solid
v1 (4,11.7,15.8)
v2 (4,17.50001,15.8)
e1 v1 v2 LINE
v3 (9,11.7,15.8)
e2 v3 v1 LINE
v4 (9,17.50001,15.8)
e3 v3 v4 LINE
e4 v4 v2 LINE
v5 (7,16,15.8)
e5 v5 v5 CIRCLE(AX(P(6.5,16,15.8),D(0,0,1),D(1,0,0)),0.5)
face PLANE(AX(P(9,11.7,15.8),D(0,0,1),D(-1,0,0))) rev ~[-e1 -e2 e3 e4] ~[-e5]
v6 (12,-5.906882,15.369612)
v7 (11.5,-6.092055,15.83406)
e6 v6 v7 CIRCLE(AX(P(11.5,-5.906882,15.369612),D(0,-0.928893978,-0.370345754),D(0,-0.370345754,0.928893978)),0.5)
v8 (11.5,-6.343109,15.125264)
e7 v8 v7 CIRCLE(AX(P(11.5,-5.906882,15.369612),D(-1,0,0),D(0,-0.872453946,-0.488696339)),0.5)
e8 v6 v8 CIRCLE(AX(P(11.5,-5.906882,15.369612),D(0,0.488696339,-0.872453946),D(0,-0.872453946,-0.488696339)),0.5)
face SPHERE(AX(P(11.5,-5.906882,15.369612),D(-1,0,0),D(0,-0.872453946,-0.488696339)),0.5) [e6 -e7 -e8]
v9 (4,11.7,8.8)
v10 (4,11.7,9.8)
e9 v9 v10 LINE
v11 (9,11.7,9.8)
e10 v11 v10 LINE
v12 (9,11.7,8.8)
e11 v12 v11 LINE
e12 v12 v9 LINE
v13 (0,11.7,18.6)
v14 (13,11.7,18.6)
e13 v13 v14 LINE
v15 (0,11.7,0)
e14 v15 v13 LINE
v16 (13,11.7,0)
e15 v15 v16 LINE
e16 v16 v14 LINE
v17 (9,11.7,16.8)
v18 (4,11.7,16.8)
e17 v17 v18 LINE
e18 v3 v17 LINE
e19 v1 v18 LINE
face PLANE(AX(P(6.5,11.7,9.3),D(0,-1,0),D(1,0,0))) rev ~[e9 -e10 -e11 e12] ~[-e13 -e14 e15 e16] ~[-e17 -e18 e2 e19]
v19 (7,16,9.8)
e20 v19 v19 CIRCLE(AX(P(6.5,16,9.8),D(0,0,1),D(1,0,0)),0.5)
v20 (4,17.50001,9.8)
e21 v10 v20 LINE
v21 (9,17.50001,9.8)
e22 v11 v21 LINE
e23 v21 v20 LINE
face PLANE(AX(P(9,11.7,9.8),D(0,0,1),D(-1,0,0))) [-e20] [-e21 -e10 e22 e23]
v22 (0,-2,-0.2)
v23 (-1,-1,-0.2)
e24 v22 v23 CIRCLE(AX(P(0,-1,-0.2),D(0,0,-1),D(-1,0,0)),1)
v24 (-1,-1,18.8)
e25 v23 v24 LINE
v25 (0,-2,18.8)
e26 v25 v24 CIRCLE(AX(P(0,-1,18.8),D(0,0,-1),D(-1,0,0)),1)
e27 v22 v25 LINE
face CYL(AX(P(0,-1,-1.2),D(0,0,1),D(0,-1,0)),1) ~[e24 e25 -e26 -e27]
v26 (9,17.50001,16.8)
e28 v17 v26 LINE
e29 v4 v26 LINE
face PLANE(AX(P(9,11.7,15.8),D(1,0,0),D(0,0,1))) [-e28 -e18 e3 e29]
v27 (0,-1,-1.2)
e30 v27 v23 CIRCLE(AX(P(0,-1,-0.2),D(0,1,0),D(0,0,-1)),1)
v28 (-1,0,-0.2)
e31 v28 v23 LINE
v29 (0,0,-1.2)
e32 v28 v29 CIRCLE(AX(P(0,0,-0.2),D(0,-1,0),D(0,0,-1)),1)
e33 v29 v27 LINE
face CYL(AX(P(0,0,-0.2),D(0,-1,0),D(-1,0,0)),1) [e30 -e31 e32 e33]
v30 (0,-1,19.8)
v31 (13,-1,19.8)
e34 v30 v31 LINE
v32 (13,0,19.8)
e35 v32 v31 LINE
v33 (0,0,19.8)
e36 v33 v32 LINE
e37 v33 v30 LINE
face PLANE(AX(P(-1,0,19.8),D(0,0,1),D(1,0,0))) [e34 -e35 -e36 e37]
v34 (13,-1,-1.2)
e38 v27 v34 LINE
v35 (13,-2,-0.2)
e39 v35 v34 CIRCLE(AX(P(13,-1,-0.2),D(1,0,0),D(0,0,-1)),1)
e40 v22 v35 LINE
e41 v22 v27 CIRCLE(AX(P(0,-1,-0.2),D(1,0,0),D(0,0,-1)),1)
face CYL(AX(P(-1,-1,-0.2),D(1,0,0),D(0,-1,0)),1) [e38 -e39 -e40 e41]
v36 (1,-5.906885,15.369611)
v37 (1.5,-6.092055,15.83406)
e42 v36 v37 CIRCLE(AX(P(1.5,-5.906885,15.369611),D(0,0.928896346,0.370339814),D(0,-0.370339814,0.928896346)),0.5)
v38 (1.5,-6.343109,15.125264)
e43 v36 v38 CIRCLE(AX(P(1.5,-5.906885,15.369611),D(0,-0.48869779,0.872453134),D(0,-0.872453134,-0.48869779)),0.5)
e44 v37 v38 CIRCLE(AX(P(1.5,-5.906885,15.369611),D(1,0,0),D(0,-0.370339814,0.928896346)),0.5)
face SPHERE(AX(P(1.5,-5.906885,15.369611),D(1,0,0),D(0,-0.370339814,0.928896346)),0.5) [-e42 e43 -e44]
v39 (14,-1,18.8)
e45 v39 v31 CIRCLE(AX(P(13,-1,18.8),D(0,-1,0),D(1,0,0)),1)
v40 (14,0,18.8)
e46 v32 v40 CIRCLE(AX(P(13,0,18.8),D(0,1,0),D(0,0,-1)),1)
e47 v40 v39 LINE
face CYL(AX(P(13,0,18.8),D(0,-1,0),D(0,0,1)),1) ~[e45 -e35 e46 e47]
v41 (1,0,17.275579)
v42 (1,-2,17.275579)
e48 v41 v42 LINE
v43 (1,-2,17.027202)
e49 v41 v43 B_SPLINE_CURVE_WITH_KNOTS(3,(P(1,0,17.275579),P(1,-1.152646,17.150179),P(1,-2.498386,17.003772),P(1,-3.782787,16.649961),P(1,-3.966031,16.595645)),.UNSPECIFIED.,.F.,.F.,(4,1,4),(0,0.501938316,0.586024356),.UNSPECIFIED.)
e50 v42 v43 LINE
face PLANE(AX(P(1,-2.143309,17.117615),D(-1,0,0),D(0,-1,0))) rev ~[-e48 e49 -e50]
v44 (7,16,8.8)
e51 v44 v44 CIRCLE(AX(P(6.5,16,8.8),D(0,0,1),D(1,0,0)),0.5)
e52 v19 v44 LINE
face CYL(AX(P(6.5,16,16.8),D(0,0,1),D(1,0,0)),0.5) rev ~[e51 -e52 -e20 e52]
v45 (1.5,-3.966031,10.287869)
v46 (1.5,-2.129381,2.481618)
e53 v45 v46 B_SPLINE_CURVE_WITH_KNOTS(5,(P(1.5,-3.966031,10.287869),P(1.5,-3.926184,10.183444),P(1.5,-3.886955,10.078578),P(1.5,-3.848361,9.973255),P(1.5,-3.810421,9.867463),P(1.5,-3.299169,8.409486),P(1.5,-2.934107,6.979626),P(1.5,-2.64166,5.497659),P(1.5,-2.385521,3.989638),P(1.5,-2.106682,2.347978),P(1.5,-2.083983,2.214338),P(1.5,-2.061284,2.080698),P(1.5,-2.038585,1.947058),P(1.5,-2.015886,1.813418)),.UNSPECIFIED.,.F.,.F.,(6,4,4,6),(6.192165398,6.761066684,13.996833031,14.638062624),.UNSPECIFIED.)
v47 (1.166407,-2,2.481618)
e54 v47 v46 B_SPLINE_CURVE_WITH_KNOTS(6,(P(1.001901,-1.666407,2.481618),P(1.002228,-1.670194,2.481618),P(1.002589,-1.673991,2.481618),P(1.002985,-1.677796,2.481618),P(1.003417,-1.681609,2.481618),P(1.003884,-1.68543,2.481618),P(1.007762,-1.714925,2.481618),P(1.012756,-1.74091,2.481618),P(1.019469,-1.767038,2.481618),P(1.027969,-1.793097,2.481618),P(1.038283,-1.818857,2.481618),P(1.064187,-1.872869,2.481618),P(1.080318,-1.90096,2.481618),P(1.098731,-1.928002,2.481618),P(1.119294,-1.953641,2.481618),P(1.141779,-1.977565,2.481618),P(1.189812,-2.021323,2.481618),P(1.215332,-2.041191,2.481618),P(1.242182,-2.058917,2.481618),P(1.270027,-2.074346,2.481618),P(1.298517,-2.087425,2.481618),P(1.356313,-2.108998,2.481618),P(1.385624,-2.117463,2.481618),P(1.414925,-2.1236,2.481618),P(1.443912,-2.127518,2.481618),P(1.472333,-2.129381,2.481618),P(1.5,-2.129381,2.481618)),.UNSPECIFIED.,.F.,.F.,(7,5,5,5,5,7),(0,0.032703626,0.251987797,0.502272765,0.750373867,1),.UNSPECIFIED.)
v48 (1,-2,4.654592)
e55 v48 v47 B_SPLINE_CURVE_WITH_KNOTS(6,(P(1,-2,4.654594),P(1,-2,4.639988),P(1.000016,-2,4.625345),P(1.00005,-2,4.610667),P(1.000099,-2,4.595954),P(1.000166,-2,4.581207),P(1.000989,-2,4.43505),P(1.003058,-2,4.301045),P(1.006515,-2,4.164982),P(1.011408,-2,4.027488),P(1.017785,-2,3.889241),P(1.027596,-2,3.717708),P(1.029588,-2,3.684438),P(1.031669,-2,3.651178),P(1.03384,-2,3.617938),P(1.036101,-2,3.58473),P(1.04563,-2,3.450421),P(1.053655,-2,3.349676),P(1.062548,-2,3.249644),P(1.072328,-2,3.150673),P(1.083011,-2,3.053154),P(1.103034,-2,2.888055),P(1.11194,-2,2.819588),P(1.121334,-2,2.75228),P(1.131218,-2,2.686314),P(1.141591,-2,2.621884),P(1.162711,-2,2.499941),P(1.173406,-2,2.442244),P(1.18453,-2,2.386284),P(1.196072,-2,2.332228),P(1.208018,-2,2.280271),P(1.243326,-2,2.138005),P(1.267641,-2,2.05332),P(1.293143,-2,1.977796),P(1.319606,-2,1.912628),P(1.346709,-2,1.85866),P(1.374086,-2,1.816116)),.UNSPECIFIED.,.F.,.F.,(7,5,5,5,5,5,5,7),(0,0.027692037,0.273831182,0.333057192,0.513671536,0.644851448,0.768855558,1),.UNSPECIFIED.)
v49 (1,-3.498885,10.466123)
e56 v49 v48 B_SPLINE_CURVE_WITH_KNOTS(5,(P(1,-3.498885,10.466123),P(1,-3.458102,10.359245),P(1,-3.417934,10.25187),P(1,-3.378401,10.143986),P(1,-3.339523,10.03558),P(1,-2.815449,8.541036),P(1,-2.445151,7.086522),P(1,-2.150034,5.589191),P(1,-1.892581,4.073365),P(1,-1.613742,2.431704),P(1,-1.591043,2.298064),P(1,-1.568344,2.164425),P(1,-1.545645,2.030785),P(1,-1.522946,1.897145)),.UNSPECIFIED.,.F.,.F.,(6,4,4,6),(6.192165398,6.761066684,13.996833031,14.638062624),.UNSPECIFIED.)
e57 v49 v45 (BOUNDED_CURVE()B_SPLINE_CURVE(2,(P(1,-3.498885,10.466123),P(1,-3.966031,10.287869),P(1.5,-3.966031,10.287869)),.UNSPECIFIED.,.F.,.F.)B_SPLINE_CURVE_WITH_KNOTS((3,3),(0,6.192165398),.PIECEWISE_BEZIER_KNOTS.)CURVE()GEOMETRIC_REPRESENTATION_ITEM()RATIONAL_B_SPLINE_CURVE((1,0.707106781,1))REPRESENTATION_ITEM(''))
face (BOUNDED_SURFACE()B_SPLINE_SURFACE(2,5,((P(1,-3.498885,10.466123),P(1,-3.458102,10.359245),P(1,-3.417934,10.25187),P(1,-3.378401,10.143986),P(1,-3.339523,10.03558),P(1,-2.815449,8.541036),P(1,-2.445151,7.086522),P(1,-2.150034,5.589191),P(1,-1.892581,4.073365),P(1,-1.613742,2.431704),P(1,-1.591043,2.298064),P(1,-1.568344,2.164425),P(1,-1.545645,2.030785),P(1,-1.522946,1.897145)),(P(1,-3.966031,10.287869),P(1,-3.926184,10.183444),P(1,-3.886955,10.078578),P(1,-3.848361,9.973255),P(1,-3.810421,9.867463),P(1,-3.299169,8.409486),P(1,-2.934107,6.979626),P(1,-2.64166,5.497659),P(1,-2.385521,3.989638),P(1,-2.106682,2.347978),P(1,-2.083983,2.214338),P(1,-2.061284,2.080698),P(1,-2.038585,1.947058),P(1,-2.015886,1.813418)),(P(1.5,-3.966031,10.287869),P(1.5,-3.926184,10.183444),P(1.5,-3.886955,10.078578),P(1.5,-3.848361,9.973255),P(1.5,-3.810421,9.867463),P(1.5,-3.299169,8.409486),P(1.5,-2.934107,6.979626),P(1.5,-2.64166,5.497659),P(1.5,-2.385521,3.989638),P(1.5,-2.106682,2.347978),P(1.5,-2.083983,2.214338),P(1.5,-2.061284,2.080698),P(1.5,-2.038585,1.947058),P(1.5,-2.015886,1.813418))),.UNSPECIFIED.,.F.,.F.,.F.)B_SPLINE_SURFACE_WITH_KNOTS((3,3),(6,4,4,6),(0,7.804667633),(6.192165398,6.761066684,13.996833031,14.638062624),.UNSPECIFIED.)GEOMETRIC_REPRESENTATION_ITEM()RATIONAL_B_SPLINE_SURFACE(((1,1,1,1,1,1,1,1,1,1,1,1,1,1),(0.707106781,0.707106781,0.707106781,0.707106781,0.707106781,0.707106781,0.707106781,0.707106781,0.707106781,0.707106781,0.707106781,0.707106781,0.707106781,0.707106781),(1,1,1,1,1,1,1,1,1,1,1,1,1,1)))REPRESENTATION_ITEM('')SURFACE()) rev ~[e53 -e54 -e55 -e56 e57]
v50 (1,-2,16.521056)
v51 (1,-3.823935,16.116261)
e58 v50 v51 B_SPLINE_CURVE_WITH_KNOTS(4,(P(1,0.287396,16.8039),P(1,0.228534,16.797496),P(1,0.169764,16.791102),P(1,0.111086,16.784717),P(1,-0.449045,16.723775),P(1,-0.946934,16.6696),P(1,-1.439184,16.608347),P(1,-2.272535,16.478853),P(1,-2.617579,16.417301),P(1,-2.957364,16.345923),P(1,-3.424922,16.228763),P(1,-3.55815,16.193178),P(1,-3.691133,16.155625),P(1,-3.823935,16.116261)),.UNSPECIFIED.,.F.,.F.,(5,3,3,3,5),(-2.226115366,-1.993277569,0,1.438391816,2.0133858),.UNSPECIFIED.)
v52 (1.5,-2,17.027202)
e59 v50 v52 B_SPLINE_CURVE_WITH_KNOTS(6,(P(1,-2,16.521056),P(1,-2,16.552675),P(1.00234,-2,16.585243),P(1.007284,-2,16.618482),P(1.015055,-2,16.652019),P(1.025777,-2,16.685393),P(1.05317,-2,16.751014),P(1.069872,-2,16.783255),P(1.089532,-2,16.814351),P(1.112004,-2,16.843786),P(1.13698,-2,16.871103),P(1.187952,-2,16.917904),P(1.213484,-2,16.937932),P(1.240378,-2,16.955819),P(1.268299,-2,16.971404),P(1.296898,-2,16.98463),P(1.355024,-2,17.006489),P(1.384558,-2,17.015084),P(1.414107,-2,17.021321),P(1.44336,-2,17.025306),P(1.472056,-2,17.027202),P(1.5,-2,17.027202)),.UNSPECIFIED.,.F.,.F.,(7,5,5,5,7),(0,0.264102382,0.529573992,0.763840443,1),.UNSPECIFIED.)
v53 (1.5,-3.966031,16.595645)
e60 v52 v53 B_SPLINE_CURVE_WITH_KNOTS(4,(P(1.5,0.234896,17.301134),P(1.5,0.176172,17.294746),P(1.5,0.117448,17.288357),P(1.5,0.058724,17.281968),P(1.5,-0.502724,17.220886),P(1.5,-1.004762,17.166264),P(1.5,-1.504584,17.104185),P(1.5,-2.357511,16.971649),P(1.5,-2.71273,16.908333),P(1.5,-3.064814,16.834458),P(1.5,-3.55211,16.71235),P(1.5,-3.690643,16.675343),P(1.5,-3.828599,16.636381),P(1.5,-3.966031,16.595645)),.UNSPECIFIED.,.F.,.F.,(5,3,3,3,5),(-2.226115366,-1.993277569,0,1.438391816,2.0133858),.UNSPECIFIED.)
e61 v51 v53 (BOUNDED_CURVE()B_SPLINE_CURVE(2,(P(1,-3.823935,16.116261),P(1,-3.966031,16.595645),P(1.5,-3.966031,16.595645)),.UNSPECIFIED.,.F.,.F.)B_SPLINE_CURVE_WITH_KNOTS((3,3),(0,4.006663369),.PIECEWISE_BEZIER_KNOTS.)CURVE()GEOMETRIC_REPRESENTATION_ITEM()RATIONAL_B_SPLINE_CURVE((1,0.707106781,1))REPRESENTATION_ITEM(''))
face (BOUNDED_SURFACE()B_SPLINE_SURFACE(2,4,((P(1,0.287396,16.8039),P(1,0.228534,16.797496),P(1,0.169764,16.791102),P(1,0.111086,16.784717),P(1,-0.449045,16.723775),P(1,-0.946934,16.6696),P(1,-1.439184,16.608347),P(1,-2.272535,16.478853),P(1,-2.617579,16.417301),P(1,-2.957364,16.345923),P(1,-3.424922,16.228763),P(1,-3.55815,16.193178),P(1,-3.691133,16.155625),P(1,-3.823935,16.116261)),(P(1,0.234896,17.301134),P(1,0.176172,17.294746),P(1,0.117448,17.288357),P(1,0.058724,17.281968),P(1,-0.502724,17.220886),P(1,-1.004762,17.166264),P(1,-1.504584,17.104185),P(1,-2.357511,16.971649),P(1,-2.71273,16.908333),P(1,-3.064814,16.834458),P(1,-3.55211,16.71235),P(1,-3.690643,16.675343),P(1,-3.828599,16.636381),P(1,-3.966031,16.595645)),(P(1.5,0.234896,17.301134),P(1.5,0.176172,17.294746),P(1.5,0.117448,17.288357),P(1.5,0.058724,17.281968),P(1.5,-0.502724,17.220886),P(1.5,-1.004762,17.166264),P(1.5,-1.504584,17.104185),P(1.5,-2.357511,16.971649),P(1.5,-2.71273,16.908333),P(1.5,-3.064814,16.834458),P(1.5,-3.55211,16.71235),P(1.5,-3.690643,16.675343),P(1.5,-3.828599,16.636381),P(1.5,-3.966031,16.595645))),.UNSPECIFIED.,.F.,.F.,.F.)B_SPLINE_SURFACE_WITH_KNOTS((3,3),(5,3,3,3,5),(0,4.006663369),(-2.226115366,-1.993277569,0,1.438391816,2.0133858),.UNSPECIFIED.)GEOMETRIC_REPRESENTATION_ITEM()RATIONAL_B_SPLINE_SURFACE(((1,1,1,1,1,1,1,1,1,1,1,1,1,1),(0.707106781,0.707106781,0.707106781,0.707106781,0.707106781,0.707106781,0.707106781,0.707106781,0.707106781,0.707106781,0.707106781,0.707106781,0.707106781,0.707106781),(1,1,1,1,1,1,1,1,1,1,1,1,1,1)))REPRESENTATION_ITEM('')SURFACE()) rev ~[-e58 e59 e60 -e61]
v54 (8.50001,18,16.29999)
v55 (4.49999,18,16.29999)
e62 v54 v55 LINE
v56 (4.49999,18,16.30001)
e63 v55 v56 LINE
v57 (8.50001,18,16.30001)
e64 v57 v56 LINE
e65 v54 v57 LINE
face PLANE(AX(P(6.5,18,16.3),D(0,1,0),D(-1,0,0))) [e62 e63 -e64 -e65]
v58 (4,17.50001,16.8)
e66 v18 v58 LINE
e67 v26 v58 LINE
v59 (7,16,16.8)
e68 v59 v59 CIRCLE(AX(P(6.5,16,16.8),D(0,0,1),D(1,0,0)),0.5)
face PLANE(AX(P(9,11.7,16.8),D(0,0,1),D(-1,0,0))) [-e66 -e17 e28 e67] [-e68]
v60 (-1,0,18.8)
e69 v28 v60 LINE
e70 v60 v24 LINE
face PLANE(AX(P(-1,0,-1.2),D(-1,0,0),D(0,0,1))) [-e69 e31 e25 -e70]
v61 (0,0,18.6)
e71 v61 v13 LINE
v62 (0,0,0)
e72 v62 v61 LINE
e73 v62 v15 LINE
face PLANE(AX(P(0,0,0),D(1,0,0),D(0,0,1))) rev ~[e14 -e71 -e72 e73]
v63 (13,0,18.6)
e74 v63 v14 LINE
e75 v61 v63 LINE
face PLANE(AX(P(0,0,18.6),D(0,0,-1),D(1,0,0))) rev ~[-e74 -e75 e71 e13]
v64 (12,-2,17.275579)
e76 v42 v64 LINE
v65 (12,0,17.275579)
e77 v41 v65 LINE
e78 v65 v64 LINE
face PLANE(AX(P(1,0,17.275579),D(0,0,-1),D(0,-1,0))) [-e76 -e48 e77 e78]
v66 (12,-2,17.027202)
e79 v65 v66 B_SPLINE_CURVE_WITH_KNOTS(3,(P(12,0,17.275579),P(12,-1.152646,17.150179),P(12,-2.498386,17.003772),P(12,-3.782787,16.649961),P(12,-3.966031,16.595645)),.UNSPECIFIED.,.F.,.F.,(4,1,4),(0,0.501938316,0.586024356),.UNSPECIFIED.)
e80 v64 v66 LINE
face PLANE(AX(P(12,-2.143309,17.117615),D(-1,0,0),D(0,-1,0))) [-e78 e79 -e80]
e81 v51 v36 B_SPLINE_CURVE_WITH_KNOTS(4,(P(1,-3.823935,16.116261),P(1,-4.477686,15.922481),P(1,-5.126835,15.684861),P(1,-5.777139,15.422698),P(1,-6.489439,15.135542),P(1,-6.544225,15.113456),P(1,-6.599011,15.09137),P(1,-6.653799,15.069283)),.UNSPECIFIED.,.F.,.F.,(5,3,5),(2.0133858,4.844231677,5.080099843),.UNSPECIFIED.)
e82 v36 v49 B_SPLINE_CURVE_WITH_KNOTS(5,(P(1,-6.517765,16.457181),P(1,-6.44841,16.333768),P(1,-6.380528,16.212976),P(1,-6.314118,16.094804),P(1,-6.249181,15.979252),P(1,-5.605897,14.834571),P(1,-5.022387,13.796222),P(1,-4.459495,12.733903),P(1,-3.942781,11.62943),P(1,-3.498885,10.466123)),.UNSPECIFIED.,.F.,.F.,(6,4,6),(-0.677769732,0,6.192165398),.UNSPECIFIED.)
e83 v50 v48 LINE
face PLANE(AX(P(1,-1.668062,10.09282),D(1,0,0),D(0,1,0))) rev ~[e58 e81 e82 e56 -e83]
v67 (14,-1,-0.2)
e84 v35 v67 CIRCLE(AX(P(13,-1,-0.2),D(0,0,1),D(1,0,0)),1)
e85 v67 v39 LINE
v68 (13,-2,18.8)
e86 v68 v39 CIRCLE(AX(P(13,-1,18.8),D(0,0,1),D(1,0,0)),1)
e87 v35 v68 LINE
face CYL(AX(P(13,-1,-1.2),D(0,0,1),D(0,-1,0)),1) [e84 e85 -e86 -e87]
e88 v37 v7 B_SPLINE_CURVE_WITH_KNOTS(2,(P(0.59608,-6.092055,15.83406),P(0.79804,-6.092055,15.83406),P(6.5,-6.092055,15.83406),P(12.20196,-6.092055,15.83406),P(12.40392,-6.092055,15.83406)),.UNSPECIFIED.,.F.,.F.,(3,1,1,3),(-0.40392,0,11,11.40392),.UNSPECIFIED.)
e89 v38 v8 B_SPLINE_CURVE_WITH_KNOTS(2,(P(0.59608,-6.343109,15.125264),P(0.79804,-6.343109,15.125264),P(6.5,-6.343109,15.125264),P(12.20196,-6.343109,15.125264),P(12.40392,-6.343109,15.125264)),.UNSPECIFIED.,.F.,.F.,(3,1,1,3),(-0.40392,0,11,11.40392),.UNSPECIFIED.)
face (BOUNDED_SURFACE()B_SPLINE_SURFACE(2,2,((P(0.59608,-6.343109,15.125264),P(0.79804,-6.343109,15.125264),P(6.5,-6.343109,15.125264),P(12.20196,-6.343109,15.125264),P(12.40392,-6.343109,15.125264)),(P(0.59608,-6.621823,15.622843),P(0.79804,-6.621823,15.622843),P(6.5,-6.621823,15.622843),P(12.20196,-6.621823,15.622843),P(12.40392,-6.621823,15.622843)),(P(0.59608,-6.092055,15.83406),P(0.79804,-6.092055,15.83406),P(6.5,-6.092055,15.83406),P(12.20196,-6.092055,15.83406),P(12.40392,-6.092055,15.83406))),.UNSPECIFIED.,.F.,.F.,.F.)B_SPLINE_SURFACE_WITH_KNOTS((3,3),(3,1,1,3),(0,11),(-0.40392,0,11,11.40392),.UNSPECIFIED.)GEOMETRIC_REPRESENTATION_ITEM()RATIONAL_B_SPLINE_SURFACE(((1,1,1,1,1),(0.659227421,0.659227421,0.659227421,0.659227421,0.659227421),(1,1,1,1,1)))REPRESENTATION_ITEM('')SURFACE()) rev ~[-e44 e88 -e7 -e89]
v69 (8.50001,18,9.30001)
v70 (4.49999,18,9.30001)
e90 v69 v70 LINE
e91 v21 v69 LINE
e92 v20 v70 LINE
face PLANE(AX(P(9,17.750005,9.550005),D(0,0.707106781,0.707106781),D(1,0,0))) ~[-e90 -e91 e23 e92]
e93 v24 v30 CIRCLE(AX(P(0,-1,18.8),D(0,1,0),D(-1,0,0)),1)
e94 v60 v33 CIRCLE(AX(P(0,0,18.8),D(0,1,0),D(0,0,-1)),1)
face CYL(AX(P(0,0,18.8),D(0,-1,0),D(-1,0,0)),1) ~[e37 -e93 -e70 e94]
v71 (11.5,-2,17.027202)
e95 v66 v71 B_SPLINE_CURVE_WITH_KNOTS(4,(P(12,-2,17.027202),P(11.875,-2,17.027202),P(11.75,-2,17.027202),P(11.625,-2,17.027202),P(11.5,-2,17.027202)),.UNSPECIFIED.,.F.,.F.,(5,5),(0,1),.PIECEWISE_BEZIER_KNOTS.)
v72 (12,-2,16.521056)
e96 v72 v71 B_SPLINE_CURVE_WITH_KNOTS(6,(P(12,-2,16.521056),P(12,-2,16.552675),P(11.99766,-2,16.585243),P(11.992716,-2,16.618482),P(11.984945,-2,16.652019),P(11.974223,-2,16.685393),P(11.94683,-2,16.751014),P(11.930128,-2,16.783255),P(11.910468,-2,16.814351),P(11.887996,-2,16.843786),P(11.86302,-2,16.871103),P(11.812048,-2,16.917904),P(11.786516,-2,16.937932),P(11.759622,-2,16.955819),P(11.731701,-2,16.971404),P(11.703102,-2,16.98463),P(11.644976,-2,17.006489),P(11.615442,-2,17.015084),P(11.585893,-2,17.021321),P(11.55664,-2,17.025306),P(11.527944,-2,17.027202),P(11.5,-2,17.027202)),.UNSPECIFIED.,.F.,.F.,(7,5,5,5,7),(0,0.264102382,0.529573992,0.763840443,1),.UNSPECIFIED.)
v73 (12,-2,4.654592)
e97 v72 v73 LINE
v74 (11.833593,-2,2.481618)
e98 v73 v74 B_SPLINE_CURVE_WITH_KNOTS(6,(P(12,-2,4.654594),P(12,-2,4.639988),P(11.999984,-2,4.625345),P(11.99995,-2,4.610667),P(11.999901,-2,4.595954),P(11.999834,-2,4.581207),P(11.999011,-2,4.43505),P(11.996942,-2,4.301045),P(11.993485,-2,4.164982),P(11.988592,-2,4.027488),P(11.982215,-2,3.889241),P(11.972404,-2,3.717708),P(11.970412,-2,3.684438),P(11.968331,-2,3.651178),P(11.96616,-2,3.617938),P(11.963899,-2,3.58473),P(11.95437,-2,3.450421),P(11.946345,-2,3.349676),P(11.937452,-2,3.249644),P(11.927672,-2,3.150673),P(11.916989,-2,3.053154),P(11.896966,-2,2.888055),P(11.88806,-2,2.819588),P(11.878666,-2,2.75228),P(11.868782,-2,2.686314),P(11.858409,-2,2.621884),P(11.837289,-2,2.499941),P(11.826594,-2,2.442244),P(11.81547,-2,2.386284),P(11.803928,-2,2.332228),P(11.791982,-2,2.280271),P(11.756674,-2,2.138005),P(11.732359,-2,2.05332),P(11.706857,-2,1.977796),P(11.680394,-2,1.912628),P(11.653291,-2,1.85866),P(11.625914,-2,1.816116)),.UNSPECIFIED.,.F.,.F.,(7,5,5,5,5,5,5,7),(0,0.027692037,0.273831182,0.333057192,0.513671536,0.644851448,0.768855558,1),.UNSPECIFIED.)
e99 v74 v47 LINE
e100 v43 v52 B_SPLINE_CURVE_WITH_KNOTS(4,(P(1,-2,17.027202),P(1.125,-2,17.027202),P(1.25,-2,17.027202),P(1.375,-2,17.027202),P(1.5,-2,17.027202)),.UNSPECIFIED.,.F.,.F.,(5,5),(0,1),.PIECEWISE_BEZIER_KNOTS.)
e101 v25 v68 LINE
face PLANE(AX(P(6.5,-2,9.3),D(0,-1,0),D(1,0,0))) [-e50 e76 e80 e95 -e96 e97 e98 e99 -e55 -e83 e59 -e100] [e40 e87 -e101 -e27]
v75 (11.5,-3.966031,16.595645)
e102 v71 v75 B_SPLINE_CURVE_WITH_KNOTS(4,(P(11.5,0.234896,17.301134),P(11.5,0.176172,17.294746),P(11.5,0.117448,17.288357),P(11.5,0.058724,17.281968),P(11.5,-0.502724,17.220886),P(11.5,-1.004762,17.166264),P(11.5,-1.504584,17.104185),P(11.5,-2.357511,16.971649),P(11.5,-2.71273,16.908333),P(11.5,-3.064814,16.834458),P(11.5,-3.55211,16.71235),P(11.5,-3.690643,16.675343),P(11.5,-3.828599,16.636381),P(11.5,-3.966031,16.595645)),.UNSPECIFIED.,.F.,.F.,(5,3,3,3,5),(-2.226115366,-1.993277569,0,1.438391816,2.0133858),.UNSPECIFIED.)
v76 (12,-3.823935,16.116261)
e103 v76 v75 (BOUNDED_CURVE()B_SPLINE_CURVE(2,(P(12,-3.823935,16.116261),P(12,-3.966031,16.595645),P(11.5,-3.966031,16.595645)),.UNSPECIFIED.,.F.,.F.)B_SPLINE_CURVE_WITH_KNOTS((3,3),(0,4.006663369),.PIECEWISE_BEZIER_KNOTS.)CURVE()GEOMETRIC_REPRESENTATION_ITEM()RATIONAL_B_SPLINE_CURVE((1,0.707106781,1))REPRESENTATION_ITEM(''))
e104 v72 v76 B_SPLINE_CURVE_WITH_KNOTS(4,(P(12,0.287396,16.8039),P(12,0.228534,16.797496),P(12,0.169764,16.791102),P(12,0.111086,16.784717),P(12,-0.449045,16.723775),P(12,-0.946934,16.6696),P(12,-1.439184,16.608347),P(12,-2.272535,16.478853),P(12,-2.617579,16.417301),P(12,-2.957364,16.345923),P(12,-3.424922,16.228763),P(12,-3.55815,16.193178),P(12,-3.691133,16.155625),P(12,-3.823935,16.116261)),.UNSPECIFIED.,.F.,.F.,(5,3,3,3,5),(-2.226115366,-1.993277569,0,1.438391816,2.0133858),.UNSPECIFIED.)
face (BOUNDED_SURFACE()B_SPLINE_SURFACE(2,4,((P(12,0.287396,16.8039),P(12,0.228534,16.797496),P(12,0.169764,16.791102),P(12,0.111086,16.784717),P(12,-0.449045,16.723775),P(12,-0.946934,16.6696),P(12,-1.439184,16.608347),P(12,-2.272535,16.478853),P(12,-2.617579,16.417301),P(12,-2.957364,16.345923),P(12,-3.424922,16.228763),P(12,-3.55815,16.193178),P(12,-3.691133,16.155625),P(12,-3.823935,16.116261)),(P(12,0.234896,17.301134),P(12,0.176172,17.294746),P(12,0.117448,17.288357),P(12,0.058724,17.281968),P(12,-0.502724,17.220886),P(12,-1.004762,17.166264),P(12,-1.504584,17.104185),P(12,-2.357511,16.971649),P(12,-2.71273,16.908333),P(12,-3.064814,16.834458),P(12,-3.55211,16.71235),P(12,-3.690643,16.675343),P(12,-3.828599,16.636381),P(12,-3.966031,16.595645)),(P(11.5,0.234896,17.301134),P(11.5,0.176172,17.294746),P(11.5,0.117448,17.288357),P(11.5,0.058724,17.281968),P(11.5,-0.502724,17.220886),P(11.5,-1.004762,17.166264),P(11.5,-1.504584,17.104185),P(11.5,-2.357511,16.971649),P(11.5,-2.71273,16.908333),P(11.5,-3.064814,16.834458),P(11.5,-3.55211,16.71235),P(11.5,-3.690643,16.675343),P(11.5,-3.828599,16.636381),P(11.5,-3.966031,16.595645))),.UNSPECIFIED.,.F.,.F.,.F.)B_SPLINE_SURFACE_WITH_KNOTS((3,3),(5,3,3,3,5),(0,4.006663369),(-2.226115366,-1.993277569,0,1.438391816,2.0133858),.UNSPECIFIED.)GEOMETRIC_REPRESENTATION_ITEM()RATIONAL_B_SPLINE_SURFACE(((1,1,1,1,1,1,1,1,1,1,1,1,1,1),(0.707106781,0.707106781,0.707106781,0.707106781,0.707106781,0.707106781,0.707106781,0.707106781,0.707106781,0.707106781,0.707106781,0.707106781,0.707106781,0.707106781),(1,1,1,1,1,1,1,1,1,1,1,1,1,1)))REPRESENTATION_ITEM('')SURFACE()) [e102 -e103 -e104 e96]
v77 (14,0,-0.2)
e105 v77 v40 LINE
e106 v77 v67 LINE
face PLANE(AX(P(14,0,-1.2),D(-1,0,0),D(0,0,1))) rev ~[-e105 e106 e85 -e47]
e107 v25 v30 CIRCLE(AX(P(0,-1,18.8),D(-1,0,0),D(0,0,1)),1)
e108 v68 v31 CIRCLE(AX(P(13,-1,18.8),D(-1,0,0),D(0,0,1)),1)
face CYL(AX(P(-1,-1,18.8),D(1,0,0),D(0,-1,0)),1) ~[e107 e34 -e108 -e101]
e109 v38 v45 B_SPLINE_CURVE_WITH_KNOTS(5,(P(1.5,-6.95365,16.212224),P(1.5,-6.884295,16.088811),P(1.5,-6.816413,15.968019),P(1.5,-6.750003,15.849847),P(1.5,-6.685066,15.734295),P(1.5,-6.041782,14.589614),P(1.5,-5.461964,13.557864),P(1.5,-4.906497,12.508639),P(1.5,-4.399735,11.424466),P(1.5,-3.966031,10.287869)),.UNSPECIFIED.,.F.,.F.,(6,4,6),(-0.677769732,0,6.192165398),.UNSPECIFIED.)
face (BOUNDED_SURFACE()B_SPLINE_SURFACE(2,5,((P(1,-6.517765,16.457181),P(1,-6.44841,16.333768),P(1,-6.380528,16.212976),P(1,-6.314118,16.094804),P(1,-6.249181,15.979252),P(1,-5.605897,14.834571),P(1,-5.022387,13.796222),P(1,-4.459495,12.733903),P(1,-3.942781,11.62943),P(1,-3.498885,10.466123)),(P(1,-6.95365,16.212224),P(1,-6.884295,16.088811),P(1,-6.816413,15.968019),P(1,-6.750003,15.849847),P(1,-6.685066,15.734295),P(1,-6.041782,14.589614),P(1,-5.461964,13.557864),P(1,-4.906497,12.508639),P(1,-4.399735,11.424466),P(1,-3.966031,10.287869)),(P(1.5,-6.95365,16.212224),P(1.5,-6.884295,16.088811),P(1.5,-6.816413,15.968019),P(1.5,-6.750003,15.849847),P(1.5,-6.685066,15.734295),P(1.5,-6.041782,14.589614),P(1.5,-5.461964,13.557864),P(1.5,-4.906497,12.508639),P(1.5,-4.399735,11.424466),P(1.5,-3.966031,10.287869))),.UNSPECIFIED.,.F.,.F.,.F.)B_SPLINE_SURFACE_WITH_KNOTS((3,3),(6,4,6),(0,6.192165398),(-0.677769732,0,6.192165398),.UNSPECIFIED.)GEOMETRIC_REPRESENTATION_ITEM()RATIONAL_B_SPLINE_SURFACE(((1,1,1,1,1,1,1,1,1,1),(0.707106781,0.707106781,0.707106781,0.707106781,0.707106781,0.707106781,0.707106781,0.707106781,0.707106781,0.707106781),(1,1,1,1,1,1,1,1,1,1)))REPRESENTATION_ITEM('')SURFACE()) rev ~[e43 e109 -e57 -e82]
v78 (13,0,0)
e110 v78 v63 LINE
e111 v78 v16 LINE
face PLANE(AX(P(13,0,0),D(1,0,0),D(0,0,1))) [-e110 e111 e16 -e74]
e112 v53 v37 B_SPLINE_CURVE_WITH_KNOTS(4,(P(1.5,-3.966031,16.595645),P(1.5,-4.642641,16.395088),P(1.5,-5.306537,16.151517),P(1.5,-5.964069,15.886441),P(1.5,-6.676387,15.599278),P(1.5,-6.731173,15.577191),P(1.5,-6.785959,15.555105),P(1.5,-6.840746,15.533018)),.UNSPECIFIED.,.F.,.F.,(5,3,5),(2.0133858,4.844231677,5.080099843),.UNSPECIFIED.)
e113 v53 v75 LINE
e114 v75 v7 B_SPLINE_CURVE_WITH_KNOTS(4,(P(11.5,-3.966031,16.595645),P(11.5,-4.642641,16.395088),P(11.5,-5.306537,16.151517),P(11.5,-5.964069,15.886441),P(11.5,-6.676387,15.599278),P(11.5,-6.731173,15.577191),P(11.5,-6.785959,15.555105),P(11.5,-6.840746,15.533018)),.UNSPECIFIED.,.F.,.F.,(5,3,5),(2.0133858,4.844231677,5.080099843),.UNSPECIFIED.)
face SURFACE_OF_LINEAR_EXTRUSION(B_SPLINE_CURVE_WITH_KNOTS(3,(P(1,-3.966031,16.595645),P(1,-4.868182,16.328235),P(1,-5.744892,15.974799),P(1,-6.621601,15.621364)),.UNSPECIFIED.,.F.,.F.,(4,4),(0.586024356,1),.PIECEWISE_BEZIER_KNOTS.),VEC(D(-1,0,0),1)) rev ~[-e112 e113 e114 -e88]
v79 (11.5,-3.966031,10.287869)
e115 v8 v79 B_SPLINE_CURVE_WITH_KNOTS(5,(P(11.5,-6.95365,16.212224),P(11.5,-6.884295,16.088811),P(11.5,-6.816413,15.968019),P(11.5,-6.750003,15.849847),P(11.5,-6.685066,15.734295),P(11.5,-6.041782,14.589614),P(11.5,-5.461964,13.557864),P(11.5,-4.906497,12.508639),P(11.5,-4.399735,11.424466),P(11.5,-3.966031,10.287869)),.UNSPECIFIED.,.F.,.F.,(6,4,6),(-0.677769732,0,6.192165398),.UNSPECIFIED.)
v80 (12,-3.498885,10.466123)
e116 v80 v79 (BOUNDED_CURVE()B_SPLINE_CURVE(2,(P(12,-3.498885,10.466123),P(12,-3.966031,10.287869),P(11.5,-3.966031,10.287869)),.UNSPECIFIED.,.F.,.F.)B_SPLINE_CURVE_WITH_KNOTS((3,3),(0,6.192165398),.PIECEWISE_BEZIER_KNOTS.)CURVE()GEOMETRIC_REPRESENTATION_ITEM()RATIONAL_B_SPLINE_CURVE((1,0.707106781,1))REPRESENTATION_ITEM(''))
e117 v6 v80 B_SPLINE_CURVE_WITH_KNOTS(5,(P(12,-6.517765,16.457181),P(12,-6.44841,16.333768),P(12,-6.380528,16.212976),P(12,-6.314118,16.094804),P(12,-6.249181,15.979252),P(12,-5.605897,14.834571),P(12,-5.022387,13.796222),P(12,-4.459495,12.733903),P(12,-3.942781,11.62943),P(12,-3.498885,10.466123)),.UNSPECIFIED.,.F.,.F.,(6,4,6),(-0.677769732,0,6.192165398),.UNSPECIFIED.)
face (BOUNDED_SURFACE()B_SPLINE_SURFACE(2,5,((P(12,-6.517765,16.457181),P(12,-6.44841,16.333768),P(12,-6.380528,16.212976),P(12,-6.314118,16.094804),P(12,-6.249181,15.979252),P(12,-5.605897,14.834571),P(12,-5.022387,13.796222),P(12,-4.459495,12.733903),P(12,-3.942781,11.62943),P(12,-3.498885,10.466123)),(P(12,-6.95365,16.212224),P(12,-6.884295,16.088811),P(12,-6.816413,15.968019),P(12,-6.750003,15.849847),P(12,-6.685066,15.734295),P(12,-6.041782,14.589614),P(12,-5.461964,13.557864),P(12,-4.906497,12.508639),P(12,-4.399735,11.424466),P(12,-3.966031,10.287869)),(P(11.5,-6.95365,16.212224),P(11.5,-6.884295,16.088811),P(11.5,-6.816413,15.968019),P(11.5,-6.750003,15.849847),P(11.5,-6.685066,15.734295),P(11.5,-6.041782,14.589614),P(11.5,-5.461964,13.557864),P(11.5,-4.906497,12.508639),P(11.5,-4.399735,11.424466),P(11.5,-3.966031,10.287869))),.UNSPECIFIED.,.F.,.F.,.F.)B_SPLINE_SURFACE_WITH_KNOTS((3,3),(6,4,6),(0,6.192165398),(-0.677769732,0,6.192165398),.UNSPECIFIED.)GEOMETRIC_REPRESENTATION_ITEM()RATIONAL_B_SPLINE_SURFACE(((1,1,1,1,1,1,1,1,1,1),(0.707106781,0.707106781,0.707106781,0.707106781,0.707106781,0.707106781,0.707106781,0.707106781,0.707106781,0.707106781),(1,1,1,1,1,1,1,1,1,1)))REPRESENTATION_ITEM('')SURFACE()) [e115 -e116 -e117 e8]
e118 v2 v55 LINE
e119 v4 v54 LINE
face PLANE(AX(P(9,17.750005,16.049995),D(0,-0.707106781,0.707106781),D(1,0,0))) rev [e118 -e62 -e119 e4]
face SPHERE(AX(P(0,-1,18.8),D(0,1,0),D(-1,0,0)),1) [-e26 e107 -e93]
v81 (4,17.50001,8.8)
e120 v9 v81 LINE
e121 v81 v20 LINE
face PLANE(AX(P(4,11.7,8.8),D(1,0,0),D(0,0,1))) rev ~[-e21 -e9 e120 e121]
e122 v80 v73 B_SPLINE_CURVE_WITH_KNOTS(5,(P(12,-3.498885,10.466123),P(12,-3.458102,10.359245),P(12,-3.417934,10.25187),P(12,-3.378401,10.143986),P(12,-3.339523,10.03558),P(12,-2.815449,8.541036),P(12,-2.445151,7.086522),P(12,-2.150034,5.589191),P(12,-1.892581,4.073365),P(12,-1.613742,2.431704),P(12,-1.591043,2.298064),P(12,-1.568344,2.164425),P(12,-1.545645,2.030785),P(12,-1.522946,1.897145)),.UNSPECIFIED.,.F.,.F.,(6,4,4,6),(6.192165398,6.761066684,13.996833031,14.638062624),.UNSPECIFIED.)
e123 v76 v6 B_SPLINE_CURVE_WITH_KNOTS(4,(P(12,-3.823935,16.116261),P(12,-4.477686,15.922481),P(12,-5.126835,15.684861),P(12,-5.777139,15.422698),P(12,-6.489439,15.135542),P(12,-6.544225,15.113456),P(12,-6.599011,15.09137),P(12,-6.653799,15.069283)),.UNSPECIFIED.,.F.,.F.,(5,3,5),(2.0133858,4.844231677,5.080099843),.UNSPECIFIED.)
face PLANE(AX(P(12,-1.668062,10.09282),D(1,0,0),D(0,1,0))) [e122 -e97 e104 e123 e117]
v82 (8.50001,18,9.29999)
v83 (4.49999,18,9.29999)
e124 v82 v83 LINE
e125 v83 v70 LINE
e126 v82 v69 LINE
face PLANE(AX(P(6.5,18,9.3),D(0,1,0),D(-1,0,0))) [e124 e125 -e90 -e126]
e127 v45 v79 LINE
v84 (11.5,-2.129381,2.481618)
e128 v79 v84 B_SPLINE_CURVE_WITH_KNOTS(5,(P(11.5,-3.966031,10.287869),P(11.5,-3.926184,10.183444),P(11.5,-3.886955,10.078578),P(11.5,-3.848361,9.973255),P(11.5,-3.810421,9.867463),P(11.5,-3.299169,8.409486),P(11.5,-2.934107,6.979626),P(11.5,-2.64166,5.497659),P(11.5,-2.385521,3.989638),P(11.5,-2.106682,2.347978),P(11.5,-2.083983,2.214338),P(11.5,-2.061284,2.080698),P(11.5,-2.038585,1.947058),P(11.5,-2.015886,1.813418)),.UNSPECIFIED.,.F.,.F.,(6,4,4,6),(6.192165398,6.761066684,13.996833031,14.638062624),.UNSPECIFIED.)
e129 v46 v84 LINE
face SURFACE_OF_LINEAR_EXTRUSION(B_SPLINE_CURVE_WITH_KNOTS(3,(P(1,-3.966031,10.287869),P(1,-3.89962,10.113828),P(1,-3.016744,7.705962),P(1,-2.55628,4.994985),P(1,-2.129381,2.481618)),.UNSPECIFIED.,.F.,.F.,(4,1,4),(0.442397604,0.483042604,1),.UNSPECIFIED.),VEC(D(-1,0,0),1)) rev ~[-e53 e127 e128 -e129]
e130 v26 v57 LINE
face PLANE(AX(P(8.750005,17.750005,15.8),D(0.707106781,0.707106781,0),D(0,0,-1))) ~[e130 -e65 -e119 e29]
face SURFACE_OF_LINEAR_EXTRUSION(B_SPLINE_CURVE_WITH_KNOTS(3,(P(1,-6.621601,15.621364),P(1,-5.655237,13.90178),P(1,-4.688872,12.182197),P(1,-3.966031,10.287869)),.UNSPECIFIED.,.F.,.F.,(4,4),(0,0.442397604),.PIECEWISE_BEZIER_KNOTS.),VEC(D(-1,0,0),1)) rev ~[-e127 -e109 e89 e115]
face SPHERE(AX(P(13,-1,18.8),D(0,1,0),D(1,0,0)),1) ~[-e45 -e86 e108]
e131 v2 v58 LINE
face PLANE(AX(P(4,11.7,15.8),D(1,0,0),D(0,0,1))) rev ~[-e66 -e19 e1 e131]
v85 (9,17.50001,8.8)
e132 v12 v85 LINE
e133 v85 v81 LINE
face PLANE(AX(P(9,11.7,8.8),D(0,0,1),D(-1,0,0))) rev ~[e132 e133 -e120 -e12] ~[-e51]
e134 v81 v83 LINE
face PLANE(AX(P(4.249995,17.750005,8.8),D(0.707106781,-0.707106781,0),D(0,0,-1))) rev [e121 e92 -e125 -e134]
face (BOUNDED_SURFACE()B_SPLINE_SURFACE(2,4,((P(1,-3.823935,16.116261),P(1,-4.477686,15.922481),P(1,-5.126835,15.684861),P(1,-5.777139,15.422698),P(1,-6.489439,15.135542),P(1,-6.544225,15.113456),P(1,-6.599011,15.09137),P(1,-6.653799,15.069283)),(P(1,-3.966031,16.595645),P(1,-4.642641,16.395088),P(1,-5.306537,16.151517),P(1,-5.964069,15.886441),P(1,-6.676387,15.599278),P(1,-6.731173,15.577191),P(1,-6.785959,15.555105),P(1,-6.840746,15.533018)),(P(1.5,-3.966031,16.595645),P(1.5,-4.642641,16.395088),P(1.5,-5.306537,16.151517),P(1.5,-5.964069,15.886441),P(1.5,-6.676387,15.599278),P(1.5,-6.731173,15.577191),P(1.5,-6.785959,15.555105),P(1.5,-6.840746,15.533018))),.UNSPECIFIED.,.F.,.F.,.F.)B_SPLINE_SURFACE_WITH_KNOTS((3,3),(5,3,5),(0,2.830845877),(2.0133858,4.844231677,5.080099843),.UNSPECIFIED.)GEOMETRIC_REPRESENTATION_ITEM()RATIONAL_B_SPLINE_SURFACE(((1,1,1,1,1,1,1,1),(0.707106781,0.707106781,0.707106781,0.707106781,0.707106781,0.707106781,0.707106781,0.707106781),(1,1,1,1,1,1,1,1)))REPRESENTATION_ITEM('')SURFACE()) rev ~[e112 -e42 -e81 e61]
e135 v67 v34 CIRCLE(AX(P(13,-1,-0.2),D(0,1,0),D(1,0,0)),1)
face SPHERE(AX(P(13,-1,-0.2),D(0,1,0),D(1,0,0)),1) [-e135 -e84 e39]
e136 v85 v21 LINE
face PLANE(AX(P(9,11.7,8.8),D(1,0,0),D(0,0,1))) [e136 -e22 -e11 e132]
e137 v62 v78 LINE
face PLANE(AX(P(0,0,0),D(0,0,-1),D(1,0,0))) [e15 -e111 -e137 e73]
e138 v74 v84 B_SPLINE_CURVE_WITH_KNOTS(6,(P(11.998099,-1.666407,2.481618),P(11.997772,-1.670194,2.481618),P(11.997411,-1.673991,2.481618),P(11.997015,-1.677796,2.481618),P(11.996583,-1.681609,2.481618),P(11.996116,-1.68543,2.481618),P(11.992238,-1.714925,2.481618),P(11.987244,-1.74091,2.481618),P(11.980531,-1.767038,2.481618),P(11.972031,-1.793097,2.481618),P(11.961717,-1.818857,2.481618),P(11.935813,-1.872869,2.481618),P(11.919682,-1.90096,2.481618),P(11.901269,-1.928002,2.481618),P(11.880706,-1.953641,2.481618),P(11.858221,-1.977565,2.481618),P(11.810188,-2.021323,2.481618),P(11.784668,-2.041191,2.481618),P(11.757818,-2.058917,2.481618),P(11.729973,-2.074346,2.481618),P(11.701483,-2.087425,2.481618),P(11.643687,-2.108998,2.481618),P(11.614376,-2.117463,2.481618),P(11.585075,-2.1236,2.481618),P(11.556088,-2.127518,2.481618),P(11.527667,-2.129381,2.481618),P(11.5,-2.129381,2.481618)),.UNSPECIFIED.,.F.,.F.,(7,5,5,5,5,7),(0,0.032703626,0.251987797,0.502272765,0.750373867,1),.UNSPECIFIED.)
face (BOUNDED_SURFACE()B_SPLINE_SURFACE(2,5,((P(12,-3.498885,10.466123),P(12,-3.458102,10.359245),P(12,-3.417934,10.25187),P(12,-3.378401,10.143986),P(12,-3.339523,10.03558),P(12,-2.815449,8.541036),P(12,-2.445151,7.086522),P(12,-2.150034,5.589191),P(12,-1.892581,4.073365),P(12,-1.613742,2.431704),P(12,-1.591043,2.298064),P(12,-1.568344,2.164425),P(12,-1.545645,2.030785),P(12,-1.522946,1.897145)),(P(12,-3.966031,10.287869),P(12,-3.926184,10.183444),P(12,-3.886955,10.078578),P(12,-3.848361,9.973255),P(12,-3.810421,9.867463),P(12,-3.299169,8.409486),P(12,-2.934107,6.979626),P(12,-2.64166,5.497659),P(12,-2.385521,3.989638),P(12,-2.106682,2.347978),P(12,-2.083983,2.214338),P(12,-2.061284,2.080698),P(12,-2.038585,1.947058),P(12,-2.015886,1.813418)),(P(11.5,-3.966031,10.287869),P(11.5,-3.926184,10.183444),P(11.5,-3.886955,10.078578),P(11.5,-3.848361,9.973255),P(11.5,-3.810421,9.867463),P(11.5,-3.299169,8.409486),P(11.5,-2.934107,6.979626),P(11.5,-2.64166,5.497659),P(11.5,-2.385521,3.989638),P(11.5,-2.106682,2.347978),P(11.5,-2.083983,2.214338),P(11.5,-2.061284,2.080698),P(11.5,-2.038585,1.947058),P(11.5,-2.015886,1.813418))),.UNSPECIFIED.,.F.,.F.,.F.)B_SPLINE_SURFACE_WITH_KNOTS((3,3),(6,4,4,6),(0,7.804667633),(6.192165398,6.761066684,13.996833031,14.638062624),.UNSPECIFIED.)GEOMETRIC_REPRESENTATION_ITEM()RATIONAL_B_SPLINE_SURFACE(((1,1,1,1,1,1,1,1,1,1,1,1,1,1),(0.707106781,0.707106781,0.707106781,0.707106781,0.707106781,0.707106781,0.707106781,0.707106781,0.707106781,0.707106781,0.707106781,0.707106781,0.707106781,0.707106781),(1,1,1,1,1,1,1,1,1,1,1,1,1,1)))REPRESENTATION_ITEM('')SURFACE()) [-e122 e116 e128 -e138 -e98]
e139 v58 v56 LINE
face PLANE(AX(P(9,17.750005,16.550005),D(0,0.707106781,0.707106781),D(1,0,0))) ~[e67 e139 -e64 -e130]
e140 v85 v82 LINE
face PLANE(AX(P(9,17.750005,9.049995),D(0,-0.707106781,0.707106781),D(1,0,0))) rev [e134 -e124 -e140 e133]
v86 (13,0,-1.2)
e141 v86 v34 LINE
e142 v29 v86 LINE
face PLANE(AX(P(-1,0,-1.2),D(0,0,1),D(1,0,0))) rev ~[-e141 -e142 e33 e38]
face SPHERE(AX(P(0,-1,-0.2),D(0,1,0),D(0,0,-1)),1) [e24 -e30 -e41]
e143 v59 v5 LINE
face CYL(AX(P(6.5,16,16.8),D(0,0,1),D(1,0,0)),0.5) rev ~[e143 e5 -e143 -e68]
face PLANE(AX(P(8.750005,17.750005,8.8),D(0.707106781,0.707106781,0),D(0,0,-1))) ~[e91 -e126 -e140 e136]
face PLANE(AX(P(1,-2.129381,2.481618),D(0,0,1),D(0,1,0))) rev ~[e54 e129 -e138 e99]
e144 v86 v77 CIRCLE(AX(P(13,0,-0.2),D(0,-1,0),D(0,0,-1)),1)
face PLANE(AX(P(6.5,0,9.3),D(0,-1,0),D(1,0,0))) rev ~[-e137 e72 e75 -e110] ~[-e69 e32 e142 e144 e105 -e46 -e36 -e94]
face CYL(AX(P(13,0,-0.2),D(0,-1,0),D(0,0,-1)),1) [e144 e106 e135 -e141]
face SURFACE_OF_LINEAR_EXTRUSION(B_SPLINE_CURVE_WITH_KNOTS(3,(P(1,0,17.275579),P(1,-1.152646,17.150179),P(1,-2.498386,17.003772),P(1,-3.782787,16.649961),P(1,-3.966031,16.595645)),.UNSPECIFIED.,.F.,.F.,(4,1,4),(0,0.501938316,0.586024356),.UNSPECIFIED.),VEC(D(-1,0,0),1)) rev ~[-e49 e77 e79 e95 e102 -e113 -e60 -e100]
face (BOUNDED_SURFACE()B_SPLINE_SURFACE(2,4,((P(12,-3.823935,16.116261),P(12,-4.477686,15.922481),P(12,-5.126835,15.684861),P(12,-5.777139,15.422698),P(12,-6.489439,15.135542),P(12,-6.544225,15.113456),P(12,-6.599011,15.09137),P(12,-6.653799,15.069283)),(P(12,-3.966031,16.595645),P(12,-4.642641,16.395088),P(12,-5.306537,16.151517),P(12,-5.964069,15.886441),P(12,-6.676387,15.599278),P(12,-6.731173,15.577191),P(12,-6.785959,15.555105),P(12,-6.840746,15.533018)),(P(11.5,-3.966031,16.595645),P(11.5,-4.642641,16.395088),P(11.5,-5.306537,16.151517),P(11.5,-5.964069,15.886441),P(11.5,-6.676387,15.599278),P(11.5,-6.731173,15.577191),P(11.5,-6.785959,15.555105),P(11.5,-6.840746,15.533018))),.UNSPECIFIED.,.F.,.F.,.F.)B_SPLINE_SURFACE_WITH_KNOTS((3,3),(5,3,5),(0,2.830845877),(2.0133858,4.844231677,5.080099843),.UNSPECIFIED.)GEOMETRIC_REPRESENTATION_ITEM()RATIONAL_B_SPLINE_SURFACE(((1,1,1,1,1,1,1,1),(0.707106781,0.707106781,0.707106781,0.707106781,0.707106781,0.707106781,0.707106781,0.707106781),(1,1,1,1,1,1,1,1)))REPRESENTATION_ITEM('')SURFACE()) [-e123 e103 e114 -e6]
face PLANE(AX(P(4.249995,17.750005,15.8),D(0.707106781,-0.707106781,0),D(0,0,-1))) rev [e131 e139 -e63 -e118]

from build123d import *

# Parameters (mm, degrees)
F0_W      = 13
F0_H      = 18.6
F1_DEPTH  = 11.7
F2_W      = 15
F2_H      = 21
F3_DEPTH  = 2
F5_START  = 1
F5_DEPTH  = 11
F6_START  = 1
F6_DEPTH  = 11
F7_R      = 1
F8_R      = 0.5
F9_W      = 5
F9_H      = 1
F10_DEPTH = 6.3
F11_SIZE  = 0.49999
F12_R     = 0.5
F13_DEPTH = 25


# Not quite as in the source:
# - a fillet or chamfer is up to 0.001 mm smaller than in the source, because OpenCascade refuses the exact size


with BuildPart() as f1:
    # F0 (on Front) → F1 (new body)
    with BuildSketch(Plane.XZ):
        with Locations((6.5, 9.3)):
            Rectangle(F0_W, F0_H)
    extrude(amount=-F1_DEPTH)

    # F2 (on Front) → F3 (join)
    with BuildSketch(Plane.XZ):
        with Locations((6.5, 9.3)):
            Rectangle(F2_W, F2_H)
    extrude(amount=F3_DEPTH)

    # F4 (on Right) → F5 (cut)
    with BuildSketch(Plane.YZ.offset(F5_START)):
        with BuildLine():
            add(Edge.make_bspline(
                [(0, 17.2755792737), (-1.1526457271, 17.1501791024), (-2.4983857291, 17.0037715611), (-3.7827872231, 16.6499606711), (-3.9660306647, 16.5956447667)],
                knots=[0, 0, 0, 0, 0.5019383156, 0.586024356, 0.586024356, 0.586024356, 0.586024356], degree=3))
            Line((0, 17.2755792737), (-3.9660306647, 17.2755792737))
            Line((-3.9660306647, 17.2755792737), (-3.9660306647, 16.5956447667))
        make_face()
        with BuildLine():
            Line((-3.9660306647, 2.481617732), (-2.1293810569, 2.481617732))
            add(Edge.make_bspline(
                [(-3.9660306647, 10.2878685019), (-3.8996200875, 10.1138282619), (-3.0167436481, 7.7059620865), (-2.5562801998, 4.9949850403), (-2.1293810569, 2.481617732)],
                knots=[0.4423976039, 0.4423976039, 0.4423976039, 0.4423976039, 0.4830426044, 1, 1, 1, 1], degree=3))
            Line((-3.9660306647, 10.2878685019), (-3.9660306647, 2.481617732))
        make_face()
        with BuildLine():
            add(Edge.make_bspline(
                [(-3.9660306647, 10.2878685019), (-3.8996200875, 10.1138282619), (-3.0167436481, 7.7059620865), (-2.5562801998, 4.9949850403), (-2.1293810569, 2.481617732)],
                knots=[0.4423976039, 0.4423976039, 0.4423976039, 0.4423976039, 0.4830426044, 1, 1, 1, 1], degree=3))
            Line((-2.1293810569, 2.481617732), (0, 2.481617732))
            Line((0, 2.481617732), (0, 17.2755792737))
            add(Edge.make_bspline(
                [(0, 17.2755792737), (-1.1526457271, 17.1501791024), (-2.4983857291, 17.0037715611), (-3.7827872231, 16.6499606711), (-3.9660306647, 16.5956447667)],
                knots=[0, 0, 0, 0, 0.5019383156, 0.586024356, 0.586024356, 0.586024356, 0.586024356], degree=3))
            Line((-3.9660306647, 16.5956447667), (-3.9660306647, 10.2878685019))
        make_face()
    extrude(amount=F5_DEPTH, mode=Mode.SUBTRACT)

    # F4 (on Right) → F6 (join)
    with BuildSketch(Plane.YZ.offset(F6_START)):
        with BuildLine():
            add(Edge.make_bspline(
                [(-3.9660306647, 10.2878685019), (-3.8996200875, 10.1138282619), (-3.0167436481, 7.7059620865), (-2.5562801998, 4.9949850403), (-2.1293810569, 2.481617732)],
                knots=[0.4423976039, 0.4423976039, 0.4423976039, 0.4423976039, 0.4830426044, 1, 1, 1, 1], degree=3))
            Line((-2.1293810569, 2.481617732), (0, 2.481617732))
            Line((0, 2.481617732), (0, 17.2755792737))
            add(Edge.make_bspline(
                [(0, 17.2755792737), (-1.1526457271, 17.1501791024), (-2.4983857291, 17.0037715611), (-3.7827872231, 16.6499606711), (-3.9660306647, 16.5956447667)],
                knots=[0, 0, 0, 0, 0.5019383156, 0.586024356, 0.586024356, 0.586024356, 0.586024356], degree=3))
            Line((-3.9660306647, 16.5956447667), (-3.9660306647, 10.2878685019))
        make_face()
        with BuildLine():
            add(Edge.make_bspline(
                [(-6.621601202, 15.6213638948), (-5.6552365252, 13.9017804778), (-4.6888718484, 12.1821970608), (-3.9660306647, 10.2878685019)],
                knots=[0, 0, 0, 0, 0.4423976039, 0.4423976039, 0.4423976039, 0.4423976039], degree=3))
            Line((-3.9660306647, 10.2878685019), (-3.9660306647, 16.5956447667))
            add(Edge.make_bspline(
                [(-3.9660306647, 16.5956447667), (-4.8681818595, 16.3282346066), (-5.7448915308, 15.9747992507), (-6.621601202, 15.6213638948)],
                knots=[0.586024356, 0.586024356, 0.586024356, 0.586024356, 1, 1, 1, 1], degree=3))
        make_face()
    extrude(amount=F6_DEPTH)

    # F7
    f7_edges = [f1.edges().sort_by_distance(p)[0] for p in [
        (14, -1, -1.2),
        (-1, -1, -1.2),
        (-1, -1, 19.8),
        (14, -1, 19.8),
        (14, -2, 9.3),
        (6.5, -2, -1.2),
        (-1, -2, 9.3),
        (6.5, -2, 19.8),
    ]]
    fillet(f7_edges, radius=F7_R)

    # F8
    f8_edges = [f1.edges().sort_by_distance(p)[0] for p in [
        (1, -4.35533, 16.47468),
        (1, -3.6216, 9.312473),
        (6.5, -6.621601, 15.621364),
        (12, -3.6216, 9.312473),
        (12, -4.35533, 16.47468),
    ]]
    fillet(f8_edges, radius=F8_R)

    # F9 (on face) → F10 (join)
    with BuildSketch(Plane(origin=(0, 11.7, 0), x_dir=(-1, 0, 0), z_dir=(0, 1, 0))):
        with Locations((-6.5, 9.3)):
            Rectangle(F9_W, F9_H)
        with Locations((-6.5, 16.3)):
            Rectangle(F9_W, F9_H)
    extrude(amount=F10_DEPTH)

    # F11 (size 0.5 in the source; OpenCascade refuses exactly that, so slightly less here)
    f11_edges = [f1.edges().sort_by_distance(p)[0] for p in [
        (4, 18, 16.3),
        (9, 18, 16.3),
        (4, 18, 9.3),
        (9, 18, 9.3),
        (6.5, 18, 16.8),
        (6.5, 18, 15.8),
        (6.5, 18, 9.8),
        (6.5, 18, 8.8),
    ]]
    chamfer(f11_edges, length=F11_SIZE)

    # F12 (on face) → F13 (cut)
    with BuildSketch(Plane.XY.offset(16.8)):
        with Locations((6.5, 16)):
            Circle(F12_R)
    extrude(amount=-F13_DEPTH, mode=Mode.SUBTRACT)


solid = f1.part
